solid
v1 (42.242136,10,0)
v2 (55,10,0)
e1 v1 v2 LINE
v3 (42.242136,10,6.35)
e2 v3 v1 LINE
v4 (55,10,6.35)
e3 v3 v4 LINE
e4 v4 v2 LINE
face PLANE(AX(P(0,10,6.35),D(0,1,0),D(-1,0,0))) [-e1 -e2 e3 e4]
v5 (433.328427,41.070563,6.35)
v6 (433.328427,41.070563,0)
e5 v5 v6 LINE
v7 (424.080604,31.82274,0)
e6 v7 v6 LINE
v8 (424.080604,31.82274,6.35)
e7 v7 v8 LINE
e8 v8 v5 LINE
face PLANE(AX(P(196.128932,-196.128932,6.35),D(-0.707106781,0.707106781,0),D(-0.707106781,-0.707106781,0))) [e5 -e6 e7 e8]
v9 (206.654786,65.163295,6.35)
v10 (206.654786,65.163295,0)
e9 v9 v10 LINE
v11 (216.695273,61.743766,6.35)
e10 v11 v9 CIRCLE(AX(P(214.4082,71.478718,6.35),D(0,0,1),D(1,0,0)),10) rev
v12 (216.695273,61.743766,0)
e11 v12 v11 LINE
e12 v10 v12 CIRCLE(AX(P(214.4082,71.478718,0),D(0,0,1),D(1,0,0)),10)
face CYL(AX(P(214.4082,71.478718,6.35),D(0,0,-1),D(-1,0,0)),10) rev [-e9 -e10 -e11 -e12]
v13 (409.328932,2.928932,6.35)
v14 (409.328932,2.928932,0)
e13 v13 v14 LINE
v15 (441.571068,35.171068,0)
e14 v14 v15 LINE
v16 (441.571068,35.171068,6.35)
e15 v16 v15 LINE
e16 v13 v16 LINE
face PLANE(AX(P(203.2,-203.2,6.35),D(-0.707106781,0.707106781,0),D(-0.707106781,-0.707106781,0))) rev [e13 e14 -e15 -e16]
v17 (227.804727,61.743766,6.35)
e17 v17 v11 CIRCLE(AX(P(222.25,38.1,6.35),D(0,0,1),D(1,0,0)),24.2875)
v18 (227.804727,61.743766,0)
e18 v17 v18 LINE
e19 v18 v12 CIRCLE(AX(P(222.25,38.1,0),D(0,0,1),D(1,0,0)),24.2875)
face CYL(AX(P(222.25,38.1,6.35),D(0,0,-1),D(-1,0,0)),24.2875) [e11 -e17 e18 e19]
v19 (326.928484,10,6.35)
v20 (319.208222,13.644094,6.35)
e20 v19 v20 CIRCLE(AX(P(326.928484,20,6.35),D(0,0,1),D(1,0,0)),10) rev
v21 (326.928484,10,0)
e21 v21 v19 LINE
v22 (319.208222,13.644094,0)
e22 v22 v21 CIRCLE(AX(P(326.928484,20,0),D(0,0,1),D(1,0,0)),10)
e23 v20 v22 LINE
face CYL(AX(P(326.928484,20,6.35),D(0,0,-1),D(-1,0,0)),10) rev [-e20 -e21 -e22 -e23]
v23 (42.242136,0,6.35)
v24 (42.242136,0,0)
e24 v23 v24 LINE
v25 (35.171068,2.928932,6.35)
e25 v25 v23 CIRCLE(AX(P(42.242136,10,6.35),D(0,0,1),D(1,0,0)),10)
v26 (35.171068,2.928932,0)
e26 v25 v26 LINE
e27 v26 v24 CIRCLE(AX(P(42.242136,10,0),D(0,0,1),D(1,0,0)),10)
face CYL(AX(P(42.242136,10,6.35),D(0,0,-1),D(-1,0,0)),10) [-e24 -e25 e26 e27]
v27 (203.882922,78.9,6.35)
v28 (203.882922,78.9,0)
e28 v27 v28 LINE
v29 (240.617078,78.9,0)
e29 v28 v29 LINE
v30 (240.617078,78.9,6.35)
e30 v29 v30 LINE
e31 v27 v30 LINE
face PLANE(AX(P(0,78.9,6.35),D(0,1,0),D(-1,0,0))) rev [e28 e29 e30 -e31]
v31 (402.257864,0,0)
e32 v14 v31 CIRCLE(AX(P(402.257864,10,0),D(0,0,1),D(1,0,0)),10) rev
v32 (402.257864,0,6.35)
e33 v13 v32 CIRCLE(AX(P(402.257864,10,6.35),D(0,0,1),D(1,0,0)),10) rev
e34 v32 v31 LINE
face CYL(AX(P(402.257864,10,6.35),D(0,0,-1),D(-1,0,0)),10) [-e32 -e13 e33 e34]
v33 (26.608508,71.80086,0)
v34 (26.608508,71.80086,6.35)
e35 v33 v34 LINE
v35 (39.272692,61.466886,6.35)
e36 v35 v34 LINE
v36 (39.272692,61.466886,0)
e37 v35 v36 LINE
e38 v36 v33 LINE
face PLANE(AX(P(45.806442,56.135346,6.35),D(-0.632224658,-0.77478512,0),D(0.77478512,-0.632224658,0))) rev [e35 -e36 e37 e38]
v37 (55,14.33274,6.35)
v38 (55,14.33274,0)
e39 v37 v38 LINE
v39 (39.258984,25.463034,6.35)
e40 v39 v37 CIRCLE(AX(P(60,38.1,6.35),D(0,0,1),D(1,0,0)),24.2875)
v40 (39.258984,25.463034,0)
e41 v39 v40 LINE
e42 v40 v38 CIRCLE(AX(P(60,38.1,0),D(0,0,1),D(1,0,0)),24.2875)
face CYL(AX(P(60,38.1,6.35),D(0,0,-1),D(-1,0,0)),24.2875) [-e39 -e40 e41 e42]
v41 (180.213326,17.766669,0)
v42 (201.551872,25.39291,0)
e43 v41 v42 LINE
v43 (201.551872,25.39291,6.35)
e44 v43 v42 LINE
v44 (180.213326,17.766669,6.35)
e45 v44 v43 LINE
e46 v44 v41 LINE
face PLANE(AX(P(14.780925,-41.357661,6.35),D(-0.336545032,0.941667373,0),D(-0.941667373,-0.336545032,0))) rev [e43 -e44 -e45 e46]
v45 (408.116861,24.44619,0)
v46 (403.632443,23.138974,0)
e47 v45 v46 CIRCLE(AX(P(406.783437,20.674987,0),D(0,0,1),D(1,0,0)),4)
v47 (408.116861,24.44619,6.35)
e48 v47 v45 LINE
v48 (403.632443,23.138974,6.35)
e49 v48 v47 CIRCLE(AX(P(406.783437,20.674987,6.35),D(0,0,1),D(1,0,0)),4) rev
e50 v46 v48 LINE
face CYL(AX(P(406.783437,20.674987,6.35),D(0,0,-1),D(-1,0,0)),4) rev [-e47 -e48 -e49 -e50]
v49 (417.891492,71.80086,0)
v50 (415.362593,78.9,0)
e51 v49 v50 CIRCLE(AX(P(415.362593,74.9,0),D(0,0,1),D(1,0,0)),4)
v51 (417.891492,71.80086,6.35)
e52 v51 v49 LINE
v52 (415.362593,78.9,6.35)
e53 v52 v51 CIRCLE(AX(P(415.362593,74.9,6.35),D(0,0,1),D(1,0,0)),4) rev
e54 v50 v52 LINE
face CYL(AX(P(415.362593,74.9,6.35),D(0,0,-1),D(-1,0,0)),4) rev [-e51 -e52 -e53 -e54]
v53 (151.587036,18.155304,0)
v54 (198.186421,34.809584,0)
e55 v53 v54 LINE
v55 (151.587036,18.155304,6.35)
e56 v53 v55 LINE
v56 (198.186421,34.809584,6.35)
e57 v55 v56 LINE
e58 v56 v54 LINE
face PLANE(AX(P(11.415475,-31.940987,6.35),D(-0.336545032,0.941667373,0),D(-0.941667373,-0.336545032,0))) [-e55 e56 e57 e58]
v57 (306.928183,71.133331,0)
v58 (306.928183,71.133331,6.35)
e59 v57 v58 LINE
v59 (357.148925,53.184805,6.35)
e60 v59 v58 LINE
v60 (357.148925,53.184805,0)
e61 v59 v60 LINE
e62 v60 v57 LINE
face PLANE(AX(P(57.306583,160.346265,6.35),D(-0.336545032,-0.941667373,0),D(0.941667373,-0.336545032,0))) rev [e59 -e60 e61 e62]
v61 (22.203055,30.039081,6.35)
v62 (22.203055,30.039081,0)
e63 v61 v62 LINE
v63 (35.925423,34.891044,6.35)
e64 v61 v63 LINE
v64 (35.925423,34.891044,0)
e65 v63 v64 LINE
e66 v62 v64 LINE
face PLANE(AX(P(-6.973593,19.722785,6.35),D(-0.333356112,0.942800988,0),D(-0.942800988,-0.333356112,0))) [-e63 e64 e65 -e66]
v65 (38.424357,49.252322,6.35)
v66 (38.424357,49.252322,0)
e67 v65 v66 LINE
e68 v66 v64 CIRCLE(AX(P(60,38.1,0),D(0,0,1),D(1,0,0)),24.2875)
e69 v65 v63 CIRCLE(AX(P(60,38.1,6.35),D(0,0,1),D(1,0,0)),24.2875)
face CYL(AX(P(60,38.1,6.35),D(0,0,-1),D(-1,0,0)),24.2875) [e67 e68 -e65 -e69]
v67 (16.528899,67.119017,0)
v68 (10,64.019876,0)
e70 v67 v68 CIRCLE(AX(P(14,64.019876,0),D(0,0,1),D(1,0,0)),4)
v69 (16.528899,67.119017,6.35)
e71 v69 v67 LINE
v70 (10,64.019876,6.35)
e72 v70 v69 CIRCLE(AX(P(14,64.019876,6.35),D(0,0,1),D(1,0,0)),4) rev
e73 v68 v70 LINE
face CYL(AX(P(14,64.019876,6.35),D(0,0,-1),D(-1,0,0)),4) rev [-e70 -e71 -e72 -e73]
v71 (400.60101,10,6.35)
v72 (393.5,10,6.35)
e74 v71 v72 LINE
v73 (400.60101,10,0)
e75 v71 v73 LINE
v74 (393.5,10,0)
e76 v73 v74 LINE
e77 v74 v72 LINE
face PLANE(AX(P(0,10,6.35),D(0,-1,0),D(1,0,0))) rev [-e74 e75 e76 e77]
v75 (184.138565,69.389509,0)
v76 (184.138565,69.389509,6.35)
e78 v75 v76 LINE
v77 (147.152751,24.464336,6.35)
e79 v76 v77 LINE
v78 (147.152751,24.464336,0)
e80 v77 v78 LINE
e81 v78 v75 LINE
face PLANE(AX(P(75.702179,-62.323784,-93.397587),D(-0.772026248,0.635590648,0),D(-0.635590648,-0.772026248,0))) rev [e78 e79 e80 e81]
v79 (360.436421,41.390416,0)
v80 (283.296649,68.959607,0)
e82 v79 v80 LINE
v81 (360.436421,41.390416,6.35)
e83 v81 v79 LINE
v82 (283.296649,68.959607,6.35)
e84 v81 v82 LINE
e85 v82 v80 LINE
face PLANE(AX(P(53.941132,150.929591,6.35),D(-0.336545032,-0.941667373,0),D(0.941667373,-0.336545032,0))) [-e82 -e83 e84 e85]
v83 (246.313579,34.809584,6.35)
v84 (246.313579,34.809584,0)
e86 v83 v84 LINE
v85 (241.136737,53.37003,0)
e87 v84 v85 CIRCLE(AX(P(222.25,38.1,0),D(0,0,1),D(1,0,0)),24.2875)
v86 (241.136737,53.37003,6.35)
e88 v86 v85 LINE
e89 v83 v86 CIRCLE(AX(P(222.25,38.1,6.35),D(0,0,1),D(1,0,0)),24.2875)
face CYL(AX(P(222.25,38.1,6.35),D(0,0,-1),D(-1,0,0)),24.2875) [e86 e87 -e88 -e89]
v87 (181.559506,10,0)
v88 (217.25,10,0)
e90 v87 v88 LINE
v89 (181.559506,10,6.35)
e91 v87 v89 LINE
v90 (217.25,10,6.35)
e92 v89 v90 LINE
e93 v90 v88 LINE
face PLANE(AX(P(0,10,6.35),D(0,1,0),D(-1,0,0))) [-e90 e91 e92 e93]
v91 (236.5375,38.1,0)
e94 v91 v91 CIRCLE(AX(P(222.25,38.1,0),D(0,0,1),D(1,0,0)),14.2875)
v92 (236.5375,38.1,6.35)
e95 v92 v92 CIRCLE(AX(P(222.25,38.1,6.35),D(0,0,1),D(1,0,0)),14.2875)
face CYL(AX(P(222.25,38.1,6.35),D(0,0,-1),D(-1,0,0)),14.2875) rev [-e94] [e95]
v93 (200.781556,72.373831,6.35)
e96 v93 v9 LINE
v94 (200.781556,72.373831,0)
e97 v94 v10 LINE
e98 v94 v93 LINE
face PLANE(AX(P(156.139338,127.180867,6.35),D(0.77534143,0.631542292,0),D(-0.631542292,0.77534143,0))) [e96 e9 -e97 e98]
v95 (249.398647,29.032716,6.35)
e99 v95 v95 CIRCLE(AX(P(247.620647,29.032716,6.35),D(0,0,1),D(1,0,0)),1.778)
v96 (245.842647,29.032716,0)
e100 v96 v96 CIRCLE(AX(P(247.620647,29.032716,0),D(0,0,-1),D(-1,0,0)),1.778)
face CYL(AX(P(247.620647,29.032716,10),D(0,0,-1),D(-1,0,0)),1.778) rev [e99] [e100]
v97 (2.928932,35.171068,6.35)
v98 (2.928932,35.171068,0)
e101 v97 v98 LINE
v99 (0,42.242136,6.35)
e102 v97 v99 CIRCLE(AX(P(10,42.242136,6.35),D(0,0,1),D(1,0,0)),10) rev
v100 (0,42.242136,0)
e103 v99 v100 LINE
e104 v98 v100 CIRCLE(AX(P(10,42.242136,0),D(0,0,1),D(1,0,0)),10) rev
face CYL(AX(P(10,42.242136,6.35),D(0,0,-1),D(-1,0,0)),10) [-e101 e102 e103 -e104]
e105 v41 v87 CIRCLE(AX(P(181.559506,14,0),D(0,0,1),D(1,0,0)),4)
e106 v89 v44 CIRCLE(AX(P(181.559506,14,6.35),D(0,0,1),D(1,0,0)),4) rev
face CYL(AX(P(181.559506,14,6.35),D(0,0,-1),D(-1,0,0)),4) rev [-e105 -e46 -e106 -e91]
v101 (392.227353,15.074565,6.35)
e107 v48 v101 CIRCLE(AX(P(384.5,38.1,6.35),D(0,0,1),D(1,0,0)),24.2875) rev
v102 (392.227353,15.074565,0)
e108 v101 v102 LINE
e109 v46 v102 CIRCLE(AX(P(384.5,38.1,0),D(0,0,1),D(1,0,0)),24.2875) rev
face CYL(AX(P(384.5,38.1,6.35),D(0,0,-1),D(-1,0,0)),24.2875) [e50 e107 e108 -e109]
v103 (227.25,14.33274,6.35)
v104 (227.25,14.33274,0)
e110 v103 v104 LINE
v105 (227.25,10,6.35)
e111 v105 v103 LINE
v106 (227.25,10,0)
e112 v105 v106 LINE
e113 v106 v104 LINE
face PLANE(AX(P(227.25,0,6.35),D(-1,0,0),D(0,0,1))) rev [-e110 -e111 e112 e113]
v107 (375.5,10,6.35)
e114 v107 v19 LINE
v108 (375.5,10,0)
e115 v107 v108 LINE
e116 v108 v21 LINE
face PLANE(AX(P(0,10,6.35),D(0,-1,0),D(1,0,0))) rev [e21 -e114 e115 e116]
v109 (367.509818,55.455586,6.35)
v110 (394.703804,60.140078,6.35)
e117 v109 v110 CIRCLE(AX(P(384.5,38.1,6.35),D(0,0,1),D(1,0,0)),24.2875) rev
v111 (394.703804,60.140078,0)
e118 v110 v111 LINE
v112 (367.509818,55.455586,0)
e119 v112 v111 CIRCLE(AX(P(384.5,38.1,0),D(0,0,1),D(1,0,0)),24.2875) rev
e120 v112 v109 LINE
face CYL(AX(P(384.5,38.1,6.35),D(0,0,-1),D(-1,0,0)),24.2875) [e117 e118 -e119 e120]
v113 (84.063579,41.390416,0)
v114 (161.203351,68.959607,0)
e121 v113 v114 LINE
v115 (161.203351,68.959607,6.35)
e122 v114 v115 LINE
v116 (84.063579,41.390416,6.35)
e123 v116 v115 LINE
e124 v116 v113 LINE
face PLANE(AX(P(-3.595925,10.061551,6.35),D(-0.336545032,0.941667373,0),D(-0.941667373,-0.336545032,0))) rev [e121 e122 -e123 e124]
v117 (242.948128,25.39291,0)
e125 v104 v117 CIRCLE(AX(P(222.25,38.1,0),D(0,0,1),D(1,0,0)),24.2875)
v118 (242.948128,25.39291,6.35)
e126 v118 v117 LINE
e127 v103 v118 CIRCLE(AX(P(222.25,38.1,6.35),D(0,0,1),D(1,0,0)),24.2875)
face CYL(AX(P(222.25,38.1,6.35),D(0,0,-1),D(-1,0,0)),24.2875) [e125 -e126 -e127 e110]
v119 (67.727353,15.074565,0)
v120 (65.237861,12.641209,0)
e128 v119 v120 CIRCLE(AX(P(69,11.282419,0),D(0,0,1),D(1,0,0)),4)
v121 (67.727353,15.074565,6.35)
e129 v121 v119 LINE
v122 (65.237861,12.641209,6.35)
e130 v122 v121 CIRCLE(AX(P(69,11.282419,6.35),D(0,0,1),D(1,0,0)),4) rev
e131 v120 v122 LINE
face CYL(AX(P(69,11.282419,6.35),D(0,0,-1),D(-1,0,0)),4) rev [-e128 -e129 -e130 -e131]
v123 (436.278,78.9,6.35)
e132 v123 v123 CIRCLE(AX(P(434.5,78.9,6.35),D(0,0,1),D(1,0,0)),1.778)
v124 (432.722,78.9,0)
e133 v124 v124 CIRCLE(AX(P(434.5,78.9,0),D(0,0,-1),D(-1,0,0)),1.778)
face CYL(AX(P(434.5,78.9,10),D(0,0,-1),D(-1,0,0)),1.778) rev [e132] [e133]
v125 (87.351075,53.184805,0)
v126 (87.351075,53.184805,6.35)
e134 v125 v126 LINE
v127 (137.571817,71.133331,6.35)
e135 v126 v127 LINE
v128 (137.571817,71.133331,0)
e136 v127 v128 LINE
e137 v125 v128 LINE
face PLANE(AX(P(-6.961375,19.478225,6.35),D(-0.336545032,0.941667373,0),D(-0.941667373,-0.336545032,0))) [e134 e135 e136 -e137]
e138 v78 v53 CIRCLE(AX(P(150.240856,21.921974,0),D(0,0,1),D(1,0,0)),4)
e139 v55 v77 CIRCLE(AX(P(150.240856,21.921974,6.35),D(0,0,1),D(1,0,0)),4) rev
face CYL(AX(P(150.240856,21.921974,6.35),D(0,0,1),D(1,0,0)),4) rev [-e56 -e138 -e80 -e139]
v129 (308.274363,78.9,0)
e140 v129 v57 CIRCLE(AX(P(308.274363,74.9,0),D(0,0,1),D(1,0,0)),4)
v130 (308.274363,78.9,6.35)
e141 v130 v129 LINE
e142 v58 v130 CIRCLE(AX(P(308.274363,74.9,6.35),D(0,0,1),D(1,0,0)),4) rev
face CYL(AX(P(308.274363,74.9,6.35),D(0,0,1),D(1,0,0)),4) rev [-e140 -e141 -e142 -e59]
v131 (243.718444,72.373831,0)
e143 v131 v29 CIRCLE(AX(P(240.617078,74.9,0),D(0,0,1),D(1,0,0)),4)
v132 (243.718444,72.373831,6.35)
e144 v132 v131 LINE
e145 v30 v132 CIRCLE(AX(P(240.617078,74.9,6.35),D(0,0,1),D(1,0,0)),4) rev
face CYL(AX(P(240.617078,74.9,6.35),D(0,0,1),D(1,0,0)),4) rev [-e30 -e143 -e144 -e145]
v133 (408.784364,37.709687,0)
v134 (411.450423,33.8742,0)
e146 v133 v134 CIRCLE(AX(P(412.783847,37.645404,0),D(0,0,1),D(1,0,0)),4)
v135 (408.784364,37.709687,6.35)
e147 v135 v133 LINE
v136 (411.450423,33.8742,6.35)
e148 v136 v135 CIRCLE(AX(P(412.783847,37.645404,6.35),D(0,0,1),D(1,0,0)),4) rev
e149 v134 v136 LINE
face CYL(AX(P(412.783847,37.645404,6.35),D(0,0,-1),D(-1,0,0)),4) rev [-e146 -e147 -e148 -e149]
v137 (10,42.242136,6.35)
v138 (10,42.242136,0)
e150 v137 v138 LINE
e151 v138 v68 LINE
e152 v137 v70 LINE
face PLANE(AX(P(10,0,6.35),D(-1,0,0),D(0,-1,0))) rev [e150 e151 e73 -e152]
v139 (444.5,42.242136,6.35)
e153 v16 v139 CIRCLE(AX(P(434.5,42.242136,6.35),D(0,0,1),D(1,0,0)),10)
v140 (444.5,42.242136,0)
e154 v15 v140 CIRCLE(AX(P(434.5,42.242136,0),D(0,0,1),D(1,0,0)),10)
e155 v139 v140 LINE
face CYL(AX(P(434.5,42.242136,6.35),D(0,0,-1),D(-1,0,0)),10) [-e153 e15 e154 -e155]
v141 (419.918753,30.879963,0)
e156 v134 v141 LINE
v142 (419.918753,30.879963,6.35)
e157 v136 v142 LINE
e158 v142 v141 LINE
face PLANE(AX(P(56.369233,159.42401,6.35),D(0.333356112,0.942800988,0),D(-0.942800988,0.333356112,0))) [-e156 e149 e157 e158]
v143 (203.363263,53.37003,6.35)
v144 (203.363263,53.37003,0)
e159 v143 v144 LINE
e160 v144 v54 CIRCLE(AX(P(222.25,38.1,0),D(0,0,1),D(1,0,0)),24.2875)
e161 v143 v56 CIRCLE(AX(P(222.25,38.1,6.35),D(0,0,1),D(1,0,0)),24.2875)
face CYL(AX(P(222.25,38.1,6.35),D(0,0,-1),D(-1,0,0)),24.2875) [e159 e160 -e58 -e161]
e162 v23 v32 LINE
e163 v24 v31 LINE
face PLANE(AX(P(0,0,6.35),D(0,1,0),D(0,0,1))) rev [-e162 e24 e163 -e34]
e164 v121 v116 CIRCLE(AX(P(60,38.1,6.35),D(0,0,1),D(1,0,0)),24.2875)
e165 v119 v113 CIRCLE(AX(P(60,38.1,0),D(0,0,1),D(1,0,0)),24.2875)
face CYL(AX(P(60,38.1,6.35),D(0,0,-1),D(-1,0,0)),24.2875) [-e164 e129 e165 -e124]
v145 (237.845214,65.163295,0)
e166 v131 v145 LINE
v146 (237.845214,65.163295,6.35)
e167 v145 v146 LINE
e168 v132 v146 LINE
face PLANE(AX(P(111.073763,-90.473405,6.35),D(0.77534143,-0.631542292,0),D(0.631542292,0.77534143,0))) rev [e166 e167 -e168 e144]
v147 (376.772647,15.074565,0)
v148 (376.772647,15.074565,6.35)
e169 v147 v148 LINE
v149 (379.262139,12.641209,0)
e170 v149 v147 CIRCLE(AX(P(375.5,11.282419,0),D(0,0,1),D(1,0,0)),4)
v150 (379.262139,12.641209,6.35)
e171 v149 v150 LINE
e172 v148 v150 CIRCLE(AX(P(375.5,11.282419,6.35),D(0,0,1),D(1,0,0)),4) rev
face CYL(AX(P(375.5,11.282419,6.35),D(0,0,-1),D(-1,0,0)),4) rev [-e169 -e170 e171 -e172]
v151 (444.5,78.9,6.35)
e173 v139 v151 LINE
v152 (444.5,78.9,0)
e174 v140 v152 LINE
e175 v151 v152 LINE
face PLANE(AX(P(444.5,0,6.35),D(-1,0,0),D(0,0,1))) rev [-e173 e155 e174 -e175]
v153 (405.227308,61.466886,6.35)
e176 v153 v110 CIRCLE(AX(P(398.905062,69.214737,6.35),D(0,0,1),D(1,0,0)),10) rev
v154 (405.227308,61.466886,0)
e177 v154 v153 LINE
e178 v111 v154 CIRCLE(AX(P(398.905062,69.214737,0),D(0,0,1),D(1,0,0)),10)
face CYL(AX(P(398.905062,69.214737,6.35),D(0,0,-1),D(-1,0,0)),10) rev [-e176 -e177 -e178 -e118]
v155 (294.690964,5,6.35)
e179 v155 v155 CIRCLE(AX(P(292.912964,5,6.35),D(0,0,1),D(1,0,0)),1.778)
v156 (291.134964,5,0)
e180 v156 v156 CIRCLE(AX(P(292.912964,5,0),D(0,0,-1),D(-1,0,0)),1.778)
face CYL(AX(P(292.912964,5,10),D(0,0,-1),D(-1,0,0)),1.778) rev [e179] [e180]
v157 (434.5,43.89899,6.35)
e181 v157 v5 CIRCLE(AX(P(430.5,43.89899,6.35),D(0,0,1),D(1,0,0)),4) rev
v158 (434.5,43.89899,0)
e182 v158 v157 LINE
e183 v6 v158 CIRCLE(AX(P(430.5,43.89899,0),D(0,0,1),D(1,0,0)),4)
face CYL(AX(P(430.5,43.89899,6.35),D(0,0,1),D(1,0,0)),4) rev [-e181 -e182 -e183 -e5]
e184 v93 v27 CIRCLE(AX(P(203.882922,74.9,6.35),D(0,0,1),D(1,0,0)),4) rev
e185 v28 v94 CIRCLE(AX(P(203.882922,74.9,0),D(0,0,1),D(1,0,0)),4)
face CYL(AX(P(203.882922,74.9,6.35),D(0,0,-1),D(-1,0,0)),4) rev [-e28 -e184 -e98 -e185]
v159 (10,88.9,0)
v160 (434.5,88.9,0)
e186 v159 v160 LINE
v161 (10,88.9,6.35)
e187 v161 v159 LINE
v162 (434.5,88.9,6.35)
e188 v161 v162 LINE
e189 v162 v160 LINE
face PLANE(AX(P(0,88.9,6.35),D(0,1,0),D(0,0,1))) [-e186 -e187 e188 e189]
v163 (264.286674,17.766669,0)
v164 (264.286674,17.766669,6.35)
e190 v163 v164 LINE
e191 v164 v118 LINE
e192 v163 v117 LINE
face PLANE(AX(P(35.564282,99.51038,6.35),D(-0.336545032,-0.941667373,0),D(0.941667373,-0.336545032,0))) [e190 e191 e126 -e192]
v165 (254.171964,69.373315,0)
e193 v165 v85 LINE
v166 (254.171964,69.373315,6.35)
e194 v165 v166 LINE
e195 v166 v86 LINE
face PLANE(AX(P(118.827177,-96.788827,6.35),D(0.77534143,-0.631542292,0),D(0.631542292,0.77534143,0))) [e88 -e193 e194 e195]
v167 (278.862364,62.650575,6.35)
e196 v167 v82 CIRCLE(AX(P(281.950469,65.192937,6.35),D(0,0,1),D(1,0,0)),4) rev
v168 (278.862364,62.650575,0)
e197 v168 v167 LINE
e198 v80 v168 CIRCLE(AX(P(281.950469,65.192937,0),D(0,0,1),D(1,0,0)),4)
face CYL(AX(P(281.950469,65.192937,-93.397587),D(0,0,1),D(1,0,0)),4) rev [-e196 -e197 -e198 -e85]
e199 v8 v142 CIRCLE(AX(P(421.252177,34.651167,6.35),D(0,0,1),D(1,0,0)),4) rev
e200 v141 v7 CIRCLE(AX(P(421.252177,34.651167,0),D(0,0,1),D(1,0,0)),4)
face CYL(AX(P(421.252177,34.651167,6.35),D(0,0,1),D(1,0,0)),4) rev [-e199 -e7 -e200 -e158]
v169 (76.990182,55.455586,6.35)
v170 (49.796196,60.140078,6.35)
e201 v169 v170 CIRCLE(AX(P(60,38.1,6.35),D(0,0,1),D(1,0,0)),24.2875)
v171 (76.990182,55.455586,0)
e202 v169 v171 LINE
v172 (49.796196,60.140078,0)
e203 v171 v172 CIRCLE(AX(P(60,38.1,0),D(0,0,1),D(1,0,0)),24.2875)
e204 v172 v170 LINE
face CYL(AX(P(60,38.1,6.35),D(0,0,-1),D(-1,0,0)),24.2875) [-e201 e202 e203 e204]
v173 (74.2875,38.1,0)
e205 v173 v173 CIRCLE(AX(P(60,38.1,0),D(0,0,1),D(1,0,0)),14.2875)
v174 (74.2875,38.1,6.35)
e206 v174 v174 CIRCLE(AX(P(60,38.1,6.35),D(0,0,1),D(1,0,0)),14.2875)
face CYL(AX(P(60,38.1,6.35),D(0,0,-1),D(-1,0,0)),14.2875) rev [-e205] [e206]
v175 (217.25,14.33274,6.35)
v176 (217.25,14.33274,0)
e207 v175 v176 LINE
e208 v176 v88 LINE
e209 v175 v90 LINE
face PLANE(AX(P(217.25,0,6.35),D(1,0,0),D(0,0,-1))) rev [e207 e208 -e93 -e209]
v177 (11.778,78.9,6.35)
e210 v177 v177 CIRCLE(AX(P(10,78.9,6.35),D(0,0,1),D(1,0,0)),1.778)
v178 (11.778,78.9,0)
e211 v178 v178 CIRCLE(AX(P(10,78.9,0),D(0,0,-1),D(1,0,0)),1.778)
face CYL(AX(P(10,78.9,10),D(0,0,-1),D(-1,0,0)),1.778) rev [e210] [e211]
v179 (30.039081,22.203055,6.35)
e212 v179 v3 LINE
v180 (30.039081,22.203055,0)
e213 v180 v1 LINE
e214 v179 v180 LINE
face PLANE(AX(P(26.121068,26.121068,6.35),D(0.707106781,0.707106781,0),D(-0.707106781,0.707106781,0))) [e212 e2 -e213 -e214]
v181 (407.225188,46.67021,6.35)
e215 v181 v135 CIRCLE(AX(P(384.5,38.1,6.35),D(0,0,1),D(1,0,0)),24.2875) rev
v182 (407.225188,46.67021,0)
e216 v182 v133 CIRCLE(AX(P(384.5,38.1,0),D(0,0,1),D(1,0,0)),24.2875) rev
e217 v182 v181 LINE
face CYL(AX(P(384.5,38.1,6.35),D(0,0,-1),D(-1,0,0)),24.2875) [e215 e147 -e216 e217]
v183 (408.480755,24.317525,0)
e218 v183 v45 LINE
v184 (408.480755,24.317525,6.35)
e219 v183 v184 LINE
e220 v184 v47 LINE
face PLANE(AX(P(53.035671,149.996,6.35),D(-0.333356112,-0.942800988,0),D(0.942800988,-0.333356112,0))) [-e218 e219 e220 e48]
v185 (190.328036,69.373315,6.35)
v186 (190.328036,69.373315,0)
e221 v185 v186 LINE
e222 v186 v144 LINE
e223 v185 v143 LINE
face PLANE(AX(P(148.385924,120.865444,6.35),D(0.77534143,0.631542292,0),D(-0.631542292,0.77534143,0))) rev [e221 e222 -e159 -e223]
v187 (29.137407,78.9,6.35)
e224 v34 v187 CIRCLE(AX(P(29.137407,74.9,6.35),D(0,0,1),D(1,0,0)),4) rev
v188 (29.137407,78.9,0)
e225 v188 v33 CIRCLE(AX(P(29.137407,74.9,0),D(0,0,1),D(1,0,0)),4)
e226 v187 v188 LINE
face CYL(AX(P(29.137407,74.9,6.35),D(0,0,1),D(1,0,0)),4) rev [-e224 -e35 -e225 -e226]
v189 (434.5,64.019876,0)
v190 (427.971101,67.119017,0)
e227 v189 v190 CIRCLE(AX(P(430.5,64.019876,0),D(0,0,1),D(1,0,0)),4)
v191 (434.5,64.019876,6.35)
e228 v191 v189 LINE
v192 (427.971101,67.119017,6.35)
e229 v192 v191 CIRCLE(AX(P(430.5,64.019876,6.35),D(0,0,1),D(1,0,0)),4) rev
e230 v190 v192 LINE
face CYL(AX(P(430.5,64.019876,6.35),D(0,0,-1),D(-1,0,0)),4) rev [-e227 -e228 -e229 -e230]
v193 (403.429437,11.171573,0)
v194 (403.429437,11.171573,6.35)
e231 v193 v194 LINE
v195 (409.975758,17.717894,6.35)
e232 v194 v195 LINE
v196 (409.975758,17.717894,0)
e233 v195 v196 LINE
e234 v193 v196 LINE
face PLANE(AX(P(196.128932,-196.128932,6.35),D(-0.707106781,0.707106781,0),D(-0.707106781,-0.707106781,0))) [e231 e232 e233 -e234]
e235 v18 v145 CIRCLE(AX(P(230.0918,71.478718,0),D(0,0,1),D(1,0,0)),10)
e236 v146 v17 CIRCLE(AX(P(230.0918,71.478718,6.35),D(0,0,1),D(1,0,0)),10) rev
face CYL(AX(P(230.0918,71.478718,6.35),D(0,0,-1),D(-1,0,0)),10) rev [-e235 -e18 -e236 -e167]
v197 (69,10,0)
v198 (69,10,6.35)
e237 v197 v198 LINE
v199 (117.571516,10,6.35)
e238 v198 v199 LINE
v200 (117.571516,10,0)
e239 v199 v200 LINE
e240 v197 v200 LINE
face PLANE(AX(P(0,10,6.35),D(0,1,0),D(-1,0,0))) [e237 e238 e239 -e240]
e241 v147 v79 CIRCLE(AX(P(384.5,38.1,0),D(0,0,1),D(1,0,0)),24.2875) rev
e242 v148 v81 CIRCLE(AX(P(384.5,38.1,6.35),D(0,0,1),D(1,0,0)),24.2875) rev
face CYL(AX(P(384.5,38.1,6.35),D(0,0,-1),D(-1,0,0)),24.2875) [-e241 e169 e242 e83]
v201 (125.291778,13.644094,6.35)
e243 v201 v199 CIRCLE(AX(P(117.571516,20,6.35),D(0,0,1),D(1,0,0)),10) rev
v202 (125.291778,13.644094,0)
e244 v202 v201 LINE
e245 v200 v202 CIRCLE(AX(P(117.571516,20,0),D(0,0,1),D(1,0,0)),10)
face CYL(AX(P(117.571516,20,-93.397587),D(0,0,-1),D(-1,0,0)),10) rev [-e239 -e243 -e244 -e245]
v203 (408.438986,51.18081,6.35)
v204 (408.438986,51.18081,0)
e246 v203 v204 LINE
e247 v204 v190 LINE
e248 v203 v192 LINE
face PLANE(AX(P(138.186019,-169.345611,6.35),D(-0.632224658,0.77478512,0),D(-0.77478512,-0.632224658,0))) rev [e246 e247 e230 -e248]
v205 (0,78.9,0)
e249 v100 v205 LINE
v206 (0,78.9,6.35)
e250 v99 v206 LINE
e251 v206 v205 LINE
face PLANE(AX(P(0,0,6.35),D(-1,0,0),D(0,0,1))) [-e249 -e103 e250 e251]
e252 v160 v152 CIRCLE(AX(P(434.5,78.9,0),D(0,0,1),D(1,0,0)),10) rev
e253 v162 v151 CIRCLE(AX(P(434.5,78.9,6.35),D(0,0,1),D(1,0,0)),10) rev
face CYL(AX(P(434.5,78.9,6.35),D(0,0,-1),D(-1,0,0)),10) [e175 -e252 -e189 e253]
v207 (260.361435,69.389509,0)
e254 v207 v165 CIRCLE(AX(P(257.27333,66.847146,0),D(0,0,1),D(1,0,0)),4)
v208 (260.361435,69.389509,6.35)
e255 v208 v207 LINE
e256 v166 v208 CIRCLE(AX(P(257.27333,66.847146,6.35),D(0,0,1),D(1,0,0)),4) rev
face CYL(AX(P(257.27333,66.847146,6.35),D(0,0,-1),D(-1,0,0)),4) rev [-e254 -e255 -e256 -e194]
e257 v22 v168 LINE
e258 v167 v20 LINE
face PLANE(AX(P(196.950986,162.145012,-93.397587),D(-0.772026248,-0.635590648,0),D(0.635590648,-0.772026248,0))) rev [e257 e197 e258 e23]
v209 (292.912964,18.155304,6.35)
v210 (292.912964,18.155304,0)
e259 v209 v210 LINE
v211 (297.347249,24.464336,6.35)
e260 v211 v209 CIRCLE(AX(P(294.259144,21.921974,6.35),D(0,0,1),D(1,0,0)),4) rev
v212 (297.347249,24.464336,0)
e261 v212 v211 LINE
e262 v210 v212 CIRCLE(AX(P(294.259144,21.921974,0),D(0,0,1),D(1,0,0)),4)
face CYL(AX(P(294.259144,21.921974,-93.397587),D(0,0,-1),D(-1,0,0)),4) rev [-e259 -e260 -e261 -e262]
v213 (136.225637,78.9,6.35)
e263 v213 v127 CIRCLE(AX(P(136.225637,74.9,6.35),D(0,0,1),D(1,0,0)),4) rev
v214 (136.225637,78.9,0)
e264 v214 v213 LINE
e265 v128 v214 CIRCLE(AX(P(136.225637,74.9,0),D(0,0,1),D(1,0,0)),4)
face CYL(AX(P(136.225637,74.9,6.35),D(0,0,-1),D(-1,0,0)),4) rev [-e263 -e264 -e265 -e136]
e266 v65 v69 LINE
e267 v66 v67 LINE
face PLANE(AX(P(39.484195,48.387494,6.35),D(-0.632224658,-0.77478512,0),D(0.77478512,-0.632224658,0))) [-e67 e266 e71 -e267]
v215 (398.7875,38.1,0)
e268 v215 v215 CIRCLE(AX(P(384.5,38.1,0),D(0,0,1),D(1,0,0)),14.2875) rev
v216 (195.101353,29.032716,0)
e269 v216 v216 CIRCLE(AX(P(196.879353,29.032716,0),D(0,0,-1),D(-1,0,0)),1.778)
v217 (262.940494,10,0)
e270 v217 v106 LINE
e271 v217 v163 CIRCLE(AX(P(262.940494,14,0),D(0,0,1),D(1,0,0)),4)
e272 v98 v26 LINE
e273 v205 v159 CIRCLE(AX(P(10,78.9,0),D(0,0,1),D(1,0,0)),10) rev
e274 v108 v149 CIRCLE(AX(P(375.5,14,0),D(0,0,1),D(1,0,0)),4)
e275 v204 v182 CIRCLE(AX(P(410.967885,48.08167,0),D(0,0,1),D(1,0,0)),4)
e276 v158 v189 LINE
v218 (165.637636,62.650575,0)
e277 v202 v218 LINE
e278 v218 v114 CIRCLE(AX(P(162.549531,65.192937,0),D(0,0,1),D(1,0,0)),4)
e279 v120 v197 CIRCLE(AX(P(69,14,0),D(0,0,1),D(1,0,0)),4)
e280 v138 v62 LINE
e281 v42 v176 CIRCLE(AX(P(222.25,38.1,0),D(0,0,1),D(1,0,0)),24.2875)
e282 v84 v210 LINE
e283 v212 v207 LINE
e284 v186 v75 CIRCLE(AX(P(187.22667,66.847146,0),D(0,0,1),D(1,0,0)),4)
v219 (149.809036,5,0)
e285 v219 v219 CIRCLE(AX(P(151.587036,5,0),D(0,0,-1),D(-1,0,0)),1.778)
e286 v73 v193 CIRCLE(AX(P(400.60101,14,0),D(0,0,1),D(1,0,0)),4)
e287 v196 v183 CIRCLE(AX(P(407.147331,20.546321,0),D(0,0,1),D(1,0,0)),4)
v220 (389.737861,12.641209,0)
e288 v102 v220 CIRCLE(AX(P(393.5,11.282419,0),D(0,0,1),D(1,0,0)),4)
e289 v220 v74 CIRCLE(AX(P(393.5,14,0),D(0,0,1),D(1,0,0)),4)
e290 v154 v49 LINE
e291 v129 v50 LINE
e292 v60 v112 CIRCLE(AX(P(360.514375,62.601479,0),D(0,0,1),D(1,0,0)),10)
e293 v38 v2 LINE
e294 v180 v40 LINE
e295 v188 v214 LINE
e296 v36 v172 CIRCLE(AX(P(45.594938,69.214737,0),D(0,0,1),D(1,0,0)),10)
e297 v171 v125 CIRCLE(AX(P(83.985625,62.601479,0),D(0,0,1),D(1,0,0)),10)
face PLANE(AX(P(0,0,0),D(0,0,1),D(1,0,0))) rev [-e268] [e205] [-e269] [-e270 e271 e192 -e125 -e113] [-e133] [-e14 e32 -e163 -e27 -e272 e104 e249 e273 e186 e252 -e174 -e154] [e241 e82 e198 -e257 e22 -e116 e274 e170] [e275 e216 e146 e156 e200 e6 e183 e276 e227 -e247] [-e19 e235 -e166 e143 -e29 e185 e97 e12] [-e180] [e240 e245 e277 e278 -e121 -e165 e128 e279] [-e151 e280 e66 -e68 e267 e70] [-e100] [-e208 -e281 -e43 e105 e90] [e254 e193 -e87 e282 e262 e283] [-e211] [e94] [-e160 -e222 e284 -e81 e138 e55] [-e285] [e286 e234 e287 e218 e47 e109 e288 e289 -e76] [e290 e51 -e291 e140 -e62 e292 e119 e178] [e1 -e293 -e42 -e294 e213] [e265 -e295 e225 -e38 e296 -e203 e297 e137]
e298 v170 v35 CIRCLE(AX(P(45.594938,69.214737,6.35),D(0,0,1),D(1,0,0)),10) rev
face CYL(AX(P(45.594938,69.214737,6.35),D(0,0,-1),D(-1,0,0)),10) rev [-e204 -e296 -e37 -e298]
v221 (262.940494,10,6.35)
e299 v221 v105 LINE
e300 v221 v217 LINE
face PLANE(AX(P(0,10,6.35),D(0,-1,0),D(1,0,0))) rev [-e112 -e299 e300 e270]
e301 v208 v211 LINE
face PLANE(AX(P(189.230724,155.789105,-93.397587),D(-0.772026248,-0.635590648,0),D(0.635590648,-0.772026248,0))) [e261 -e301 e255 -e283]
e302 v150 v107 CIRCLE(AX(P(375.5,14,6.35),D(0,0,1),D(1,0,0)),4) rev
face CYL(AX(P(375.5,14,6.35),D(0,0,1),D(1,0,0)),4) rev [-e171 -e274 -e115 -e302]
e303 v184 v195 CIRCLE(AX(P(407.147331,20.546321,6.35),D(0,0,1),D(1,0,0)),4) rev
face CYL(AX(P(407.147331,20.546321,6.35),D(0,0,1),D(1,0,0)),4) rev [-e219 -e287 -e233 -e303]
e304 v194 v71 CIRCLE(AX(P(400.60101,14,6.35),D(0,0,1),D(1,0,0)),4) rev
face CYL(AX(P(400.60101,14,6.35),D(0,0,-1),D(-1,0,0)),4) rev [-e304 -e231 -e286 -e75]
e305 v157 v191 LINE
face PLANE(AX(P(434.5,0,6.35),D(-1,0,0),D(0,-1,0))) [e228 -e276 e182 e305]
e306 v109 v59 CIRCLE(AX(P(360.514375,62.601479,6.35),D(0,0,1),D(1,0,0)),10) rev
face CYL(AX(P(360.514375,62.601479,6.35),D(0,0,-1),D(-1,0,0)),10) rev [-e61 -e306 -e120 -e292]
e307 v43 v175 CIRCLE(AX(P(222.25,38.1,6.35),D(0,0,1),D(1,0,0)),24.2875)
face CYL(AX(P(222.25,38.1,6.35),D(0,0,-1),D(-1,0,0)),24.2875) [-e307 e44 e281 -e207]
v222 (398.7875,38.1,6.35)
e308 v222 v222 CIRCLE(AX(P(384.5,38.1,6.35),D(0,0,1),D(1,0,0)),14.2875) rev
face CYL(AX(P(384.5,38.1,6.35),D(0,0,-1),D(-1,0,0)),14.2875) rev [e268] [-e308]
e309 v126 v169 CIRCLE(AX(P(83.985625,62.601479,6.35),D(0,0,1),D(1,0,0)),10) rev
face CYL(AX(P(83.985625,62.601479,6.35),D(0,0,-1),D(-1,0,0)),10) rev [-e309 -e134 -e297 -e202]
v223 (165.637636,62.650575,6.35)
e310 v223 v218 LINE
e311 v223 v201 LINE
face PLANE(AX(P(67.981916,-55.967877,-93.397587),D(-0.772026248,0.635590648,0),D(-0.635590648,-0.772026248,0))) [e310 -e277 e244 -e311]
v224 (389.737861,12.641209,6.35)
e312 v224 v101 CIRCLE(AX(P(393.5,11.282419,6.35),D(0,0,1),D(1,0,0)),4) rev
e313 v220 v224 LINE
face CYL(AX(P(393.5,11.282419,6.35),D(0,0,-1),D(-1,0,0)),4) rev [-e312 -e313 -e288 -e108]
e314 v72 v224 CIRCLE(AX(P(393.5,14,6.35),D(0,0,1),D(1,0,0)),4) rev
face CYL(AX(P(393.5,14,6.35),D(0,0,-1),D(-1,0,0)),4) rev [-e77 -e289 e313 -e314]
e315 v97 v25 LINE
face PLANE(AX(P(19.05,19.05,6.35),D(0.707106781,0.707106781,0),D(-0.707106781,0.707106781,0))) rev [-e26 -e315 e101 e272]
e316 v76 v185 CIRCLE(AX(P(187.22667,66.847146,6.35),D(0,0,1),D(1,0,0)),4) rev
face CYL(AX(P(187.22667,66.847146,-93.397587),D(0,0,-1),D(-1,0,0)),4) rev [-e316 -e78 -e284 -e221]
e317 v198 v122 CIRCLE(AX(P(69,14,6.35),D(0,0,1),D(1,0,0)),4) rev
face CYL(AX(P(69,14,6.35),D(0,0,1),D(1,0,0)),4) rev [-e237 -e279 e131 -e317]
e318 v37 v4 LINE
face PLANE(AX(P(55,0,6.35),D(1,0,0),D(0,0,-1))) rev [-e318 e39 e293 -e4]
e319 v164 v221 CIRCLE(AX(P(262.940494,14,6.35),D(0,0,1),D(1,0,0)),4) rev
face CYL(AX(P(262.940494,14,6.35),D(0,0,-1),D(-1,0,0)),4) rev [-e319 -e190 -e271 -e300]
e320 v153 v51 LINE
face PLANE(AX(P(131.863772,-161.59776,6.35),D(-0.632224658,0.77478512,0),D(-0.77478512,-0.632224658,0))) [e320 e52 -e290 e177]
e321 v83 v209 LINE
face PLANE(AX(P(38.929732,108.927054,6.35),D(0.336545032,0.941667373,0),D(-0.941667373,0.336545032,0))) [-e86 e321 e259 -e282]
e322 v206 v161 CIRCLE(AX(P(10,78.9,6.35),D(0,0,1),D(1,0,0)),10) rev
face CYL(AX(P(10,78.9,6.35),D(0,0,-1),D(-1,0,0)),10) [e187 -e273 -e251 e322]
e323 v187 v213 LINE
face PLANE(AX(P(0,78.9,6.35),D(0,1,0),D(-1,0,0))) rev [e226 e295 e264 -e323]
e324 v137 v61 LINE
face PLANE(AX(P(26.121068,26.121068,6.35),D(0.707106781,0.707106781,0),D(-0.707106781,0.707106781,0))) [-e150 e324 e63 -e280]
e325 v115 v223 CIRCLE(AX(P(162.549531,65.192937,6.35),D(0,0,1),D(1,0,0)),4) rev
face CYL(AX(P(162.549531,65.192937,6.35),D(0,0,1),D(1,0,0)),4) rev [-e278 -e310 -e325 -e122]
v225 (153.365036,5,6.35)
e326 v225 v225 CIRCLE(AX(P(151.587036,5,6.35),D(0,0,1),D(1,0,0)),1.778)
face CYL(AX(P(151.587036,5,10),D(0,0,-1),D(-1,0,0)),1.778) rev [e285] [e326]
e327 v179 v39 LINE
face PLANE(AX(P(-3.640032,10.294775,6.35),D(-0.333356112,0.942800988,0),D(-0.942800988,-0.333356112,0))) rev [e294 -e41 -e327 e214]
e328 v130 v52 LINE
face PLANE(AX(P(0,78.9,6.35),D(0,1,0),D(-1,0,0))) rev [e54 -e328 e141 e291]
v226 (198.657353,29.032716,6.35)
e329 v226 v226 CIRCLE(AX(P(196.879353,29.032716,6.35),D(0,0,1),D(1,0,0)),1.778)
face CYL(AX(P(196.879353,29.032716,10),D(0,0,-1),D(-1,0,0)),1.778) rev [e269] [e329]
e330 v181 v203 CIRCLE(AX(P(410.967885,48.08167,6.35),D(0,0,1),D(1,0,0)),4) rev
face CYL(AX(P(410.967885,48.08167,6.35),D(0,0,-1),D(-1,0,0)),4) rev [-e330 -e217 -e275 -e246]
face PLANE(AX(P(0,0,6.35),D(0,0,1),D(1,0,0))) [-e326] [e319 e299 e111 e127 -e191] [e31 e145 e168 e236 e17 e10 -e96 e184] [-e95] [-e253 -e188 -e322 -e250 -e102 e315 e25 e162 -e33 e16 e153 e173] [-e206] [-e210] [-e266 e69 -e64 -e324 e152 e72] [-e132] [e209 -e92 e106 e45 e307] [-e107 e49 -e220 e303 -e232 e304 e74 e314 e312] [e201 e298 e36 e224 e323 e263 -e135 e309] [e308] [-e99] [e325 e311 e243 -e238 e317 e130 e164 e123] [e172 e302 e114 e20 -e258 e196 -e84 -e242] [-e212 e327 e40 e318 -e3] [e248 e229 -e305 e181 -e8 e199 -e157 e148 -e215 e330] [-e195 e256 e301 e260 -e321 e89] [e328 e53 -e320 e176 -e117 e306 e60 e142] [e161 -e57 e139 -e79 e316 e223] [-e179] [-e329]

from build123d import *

# Parameters (mm, degrees)
SKETCH1_R           = 14.2875
BOSS_EXTRUDE1_DEPTH = 6.35
BOSS_EXTRUDE2_DEPTH = 6.35
FILLET1_R           = 10
FILLET2_R           = 4
FILLET3_R           = 4
SKETCH3_R           = 1.778
CUT_EXTRUDE1_DEPTH  = 10
SKETCH4_R           = 1.778
CUT_EXTRUDE2_DEPTH  = 10


with BuildPart() as part:
    # Sketch1 → Boss-Extrude1 (new body)
    with BuildSketch(Plane.XY):
        with BuildLine():
            Line((2.928932188, 35.171067812), (35.171067812, 2.928932188))
            ThreePointArc((35.171067812, 2.928932188), (38.4153013, 0.761204675), (42.242135624, 0))
            Line((42.242135624, 0), (402.257864376, 0))
            ThreePointArc((402.257864376, 0), (406.0846987, 0.761204675), (409.328932188, 2.928932188))
            Line((409.328932188, 2.928932188), (441.571067812, 35.171067812))
            ThreePointArc((441.571067812, 35.171067812), (443.738795325, 38.4153013), (444.5, 42.242135624))
            Line((444.5, 42.242135624), (444.5, 78.9))
            ThreePointArc((444.5, 78.9), (441.571067812, 85.971067812), (434.5, 88.9))
            Line((434.5, 88.9), (10, 88.9))
            ThreePointArc((10, 88.9), (2.928932188, 85.971067812), (0, 78.9))
            Line((0, 78.9), (0, 42.242135624))
            ThreePointArc((0, 42.242135624), (0.761204675, 38.4153013), (2.928932188, 35.171067812))
        make_face()
        with Locations((60, 38.1)):
            Circle(SKETCH1_R, mode=Mode.SUBTRACT)
        with Locations((384.5, 38.1)):
            Circle(SKETCH1_R, mode=Mode.SUBTRACT)
        with Locations((222.25, 38.1)):
            Circle(SKETCH1_R, mode=Mode.SUBTRACT)
        with BuildLine():
            Line((42.242135624, 10), (55, 10))
            Line((55, 10), (55, 14.332739824))
            ThreePointArc((55, 14.332739824), (45.977844894, 18.269169901), (39.258984185, 25.463033624))
            Line((39.258984185, 25.463033624), (30.039080729, 22.203054895))
            Line((30.039080729, 22.203054895), (42.242135624, 10))
        make_face(mode=Mode.SUBTRACT)
        with BuildLine():
            Line((402.257864376, 10), (414.460919271, 22.203054895))
            Line((414.460919271, 22.203054895), (405.241015815, 25.463033624))
            ThreePointArc((405.241015815, 25.463033624), (398.522155106, 18.269169901), (389.5, 14.332739824))
            Line((389.5, 14.332739824), (389.5, 10))
            Line((389.5, 10), (402.257864376, 10))
        make_face(mode=Mode.SUBTRACT)
        with BuildLine():
            Line((434.5, 42.242135624), (434.5, 72.446597797))
            Line((434.5, 72.446597797), (406.075642814, 49.252322333))
            ThreePointArc((406.075642814, 49.252322333), (408.427959025, 42.263584169), (408.574576932, 34.891043503))
            Line((408.574576932, 34.891043503), (420.045712746, 30.835072751))
            Line((420.045712746, 30.835072751), (422.296945105, 30.039080729))
            Line((422.296945105, 30.039080729), (434.5, 42.242135624))
        make_face(mode=Mode.SUBTRACT)
        with BuildLine():
            Line((17.908581132, 78.9), (159.303289572, 78.9))
            Line((159.303289572, 78.9), (80.698128287, 50.807090212))
            ThreePointArc((80.698128287, 50.807090212), (64.123087075, 62.034970424), (44.746603764, 57.000173532))
            Line((44.746603764, 57.000173532), (17.908581132, 78.9))
        make_face(mode=Mode.SUBTRACT)
        with BuildLine():
            Line((10, 42.242135624), (10, 72.446597797))
            Line((10, 72.446597797), (38.424357186, 49.252322333))
            ThreePointArc((38.424357186, 49.252322333), (36.072040975, 42.263584169), (35.925423068, 34.891043503))
            Line((35.925423068, 34.891043503), (24.454287254, 30.835072751))
            Line((24.454287254, 30.835072751), (22.203054895, 30.039080729))
            Line((22.203054895, 30.039080729), (10, 42.242135624))
        make_face(mode=Mode.SUBTRACT)
        with BuildLine():
            Line((65, 14.332739824), (65, 10))
            Line((65, 10), (128.768147223, 10))
            Line((128.768147223, 10), (141.942274838, 14.708336864))
            Line((141.942274838, 14.708336864), (198.186421388, 34.809583517))
            ThreePointArc((198.186421388, 34.809583517), (198.85545044, 44.625159549), (203.363262878, 53.370030031))
            Line((203.363262878, 53.370030031), (185.140287975, 75.742288539))
            Line((185.140287975, 75.742288539), (184.022239752, 77.114910957))
            Line((184.022239752, 77.114910957), (175.842867511, 74.191663136))
            Line((175.842867511, 74.191663136), (84.063578612, 41.390416483))
            ThreePointArc((84.063578612, 41.390416483), (79.854530137, 24.1114229), (65, 14.332739824))
        make_face(mode=Mode.SUBTRACT)
        with BuildLine():
            Line((399.753396236, 57.000173532), (426.591418868, 78.9))
            Line((426.591418868, 78.9), (285.196710428, 78.9))
            Line((285.196710428, 78.9), (363.801871713, 50.807090212))
            ThreePointArc((363.801871713, 50.807090212), (380.376912925, 62.034970424), (399.753396236, 57.000173532))
        make_face(mode=Mode.SUBTRACT)
        with BuildLine():
            Line((158.481852777, 10), (201.551871713, 25.392909788))
            ThreePointArc((201.551871713, 25.392909788), (208.2614229, 18.245469863), (217.25, 14.332739824))
            Line((217.25, 14.332739824), (217.25, 10))
            Line((217.25, 10), (158.481852777, 10))
        make_face(mode=Mode.SUBTRACT)
        with BuildLine():
            Line((195.465766991, 78.9), (211.116677179, 59.685452953))
            ThreePointArc((211.116677179, 59.685452953), (222.25, 62.3875), (233.383322821, 59.685452953))
            Line((233.383322821, 59.685452953), (249.034233009, 78.9))
            Line((249.034233009, 78.9), (195.465766991, 78.9))
        make_face(mode=Mode.SUBTRACT)
        with BuildLine():
            Line((379.5, 14.332739824), (379.5, 10))
            Line((379.5, 10), (315.731852777, 10))
            Line((315.731852777, 10), (302.557725162, 14.708336864))
            Line((302.557725162, 14.708336864), (246.313578612, 34.809583517))
            ThreePointArc((246.313578612, 34.809583517), (245.64454956, 44.625159549), (241.136737122, 53.370030031))
            Line((241.136737122, 53.370030031), (259.359712025, 75.742288539))
            Line((259.359712025, 75.742288539), (260.477760248, 77.114910957))
            Line((260.477760248, 77.114910957), (268.657132489, 74.191663136))
            Line((268.657132489, 74.191663136), (360.436421388, 41.390416483))
            ThreePointArc((360.436421388, 41.390416483), (364.645469863, 24.1114229), (379.5, 14.332739824))
        make_face(mode=Mode.SUBTRACT)
        with BuildLine():
            Line((286.018147223, 10), (227.25, 10))
            Line((227.25, 10), (227.25, 14.332739824))
            ThreePointArc((227.25, 14.332739824), (236.2385771, 18.245469863), (242.948128287, 25.392909788))
            Line((242.948128287, 25.392909788), (286.018147223, 10))
        make_face(mode=Mode.SUBTRACT)
    extrude(amount=BOSS_EXTRUDE1_DEPTH)

    # Sketch2 → Boss-Extrude2 (add)
    with BuildSketch(Plane.XY.offset(6.35)):
        Polygon((184.022239752, 77.114910957), (174.845752388, 73.835301483), (124.908015982, 13.177953241), (122.291683488, 10), (128.768147223, 10), (137.944634587, 13.279609474), (187.243188129, 73.160568149), align=None)
        Polygon((269.654247612, 73.835301483), (319.591984018, 13.177953241), (322.208316512, 10), (315.731852777, 10), (306.555365413, 13.279609474), (257.256811871, 73.160568149), (260.477760248, 77.114910957), align=None)
    extrude(amount=-BOSS_EXTRUDE2_DEPTH)

    # Fillet1
    fillet1_edges = [part.edges().sort_by_distance(p)[0] for p in [
        (211.116677179, 59.685452953, 3.175),
        (233.383322821, 59.685452953, 3.175),
        (44.746603764, 57.000173532, 3.175),
        (80.698128287, 50.807090212, 3.175),
        (399.753396236, 57.000173532, 3.175),
        (363.801871713, 50.807090212, 3.175),
        (122.291683488, 10, 3.175),
        (322.208316512, 10, 3.175),
    ]]
    fillet(fillet1_edges, radius=FILLET1_R)

    # Fillet2
    fillet2_edges = [part.edges().sort_by_distance(p)[0] for p in [
        (249.034233009, 78.9, 3.175),
        (195.465766991, 78.9, 3.175),
        (286.018147223, 10, 3.175),
        (159.303289572, 78.9, 3.175),
        (17.908581132, 78.9, 3.175),
        (158.481852777, 10, 3.175),
        (10, 72.446597797, 3.175),
        (426.591418868, 78.9, 3.175),
        (285.196710428, 78.9, 3.175),
        (434.5, 72.446597797, 3.175),
        (174.845752388, 73.835301483, 3.175),
        (187.243188129, 73.160568149, 3.175),
        (137.944634587, 13.279609474, 3.175),
        (269.654247612, 73.835301483, 3.175),
        (306.555365413, 13.279609474, 3.175),
        (257.256811871, 73.160568149, 3.175),
    ]]
    fillet(fillet2_edges, radius=FILLET2_R)

    # Fillet3
    # the kernel refuses this fillet: 4 mm, written as the material it adds along each edge
    with BuildSketch(Plane(origin=(434.5, 42.242135624, 0), x_dir=(0, 1, 0), z_dir=(0, 0, 1)), Plane(origin=(402.257864376, 10, 0), x_dir=(0.7071067811865684, 0.7071067811865266, 0), z_dir=(0, 0, 1))) as fillet3_piece_1:
        with BuildLine():
            CenterArc((FILLET3_R * 0.414213562373, FILLET3_R), FILLET3_R, 225, 45)
            Line((-FILLET3_R * 0.292893218813, FILLET3_R * 0.292893218813), (0, 0))
            Line((0, 0), (FILLET3_R * 0.414213562373, 0))
        make_face()
    extrude(amount=6.35)
    with BuildSketch(Plane(origin=(422.296945105, 30.039080729, 0), x_dir=(-0.9428009879202438, 0.33335611165330736, 0), z_dir=(0, 0, 1))) as fillet3_piece_2:
        with BuildLine():
            CenterArc((FILLET3_R * 0.630618821441, -FILLET3_R), FILLET3_R, 90, 64.47260491)
            Line((-FILLET3_R * 0.271760517527, -FILLET3_R * 0.569057395232), (0, 0))
            Line((0, 0), (FILLET3_R * 0.630618821441, 0))
        make_face()
    extrude(amount=6.35)
    with BuildSketch(Plane(origin=(408.574576932, 34.891043503, 0), x_dir=(0.07422292500138471, 0.9972416745223992, 0), z_dir=(0, 0, 1)), Plane(origin=(389.5, 14.332739824, 0), x_dir=(0.9649431016089534, 0.262459159979783, 0), z_dir=(0, 0, 1)), Plane(origin=(65, 14.332739824, 0), x_dir=(0.9649431016089596, 0.2624591599797595, 0), z_dir=(0, 0, 1))) as fillet3_piece_3:
        with BuildLine():
            CenterArc((3.059187738, -3.993222777), FILLET3_R, 93.335760439, 71.44820939)
            Line((-0.800584668, -2.943386137), (0, 0))
            ThreePointArc((0, 0), (1.413219633, -0.04115045), (2.826439265, 0))
        make_face()
    extrude(amount=6.35)
    with BuildSketch(Plane(origin=(406.075642814, 49.252322333, 0), x_dir=(0.774785119901029, 0.632224657839243, 0), z_dir=(0, 0, 1))) as fillet3_piece_4:
        with BuildLine():
            CenterArc((3.050320928, -4), FILLET3_R, 90, 71.44820939)
            ThreePointArc((-0.741824875, -2.727353071), (-0.331204595, -1.374476848), (0, 0))
            Line((0, 0), (3.050320928, 0))
        make_face()
    extrude(amount=6.35)
    with BuildSketch(Plane(origin=(414.460919271, 22.203054895, 0), x_dir=(-0.9428009879202406, 0.33335611165331624, 0), z_dir=(0, 0, 1))) as fillet3_piece_5:
        with BuildLine():
            CenterArc((FILLET3_R * 1.58574398036, FILLET3_R), FILLET3_R, 154.47260491, 115.52739509)
            Line((FILLET3_R * 0.68336464139, FILLET3_R * 1.43094260477), (0, 0))
            Line((0, 0), (FILLET3_R * 1.58574398036, 0))
        make_face()
    extrude(amount=6.35)
    with BuildSketch(Plane(origin=(405.241015815, 25.463033624, 0), x_dir=(-0.5691164356367163, -0.82225694444508, 0), z_dir=(0, 0, 1)), Plane(origin=(379.5, 14.332739824, 0), x_dir=(-0.9649431016089597, 0.2624591599797589, 0), z_dir=(0, 0, 1))) as fillet3_piece_6:
        with BuildLine():
            CenterArc((3.059187738, 3.993222777), FILLET3_R, 195.216030171, 71.44820939)
            Line((-0.800584668, 2.943386137), (0, 0))
            ThreePointArc((0, 0), (1.413219633, 0.04115045), (2.826439265, 0))
        make_face()
    extrude(amount=6.35)
    with BuildSketch(Plane(origin=(389.5, 10, 0), x_dir=(1, 0, 0), z_dir=(0, 0, 1)), Plane(origin=(65, 10, 0), x_dir=(1, 0, 0), z_dir=(0, 0, 1))) as fillet3_piece_7:
        with BuildLine():
            CenterArc((FILLET3_R, FILLET3_R), FILLET3_R, 180, 90)
            Line((0, FILLET3_R), (0, 0))
            Line((0, 0), (FILLET3_R, 0))
        make_face()
    extrude(amount=6.35)
    with BuildSketch(Plane(origin=(379.5, 10, 0), x_dir=(-1, 0, 0), z_dir=(0, 0, 1))) as fillet3_piece_8:
        with BuildLine():
            CenterArc((FILLET3_R, -FILLET3_R), FILLET3_R, 90, 90)
            Line((0, -FILLET3_R), (0, 0))
            Line((0, 0), (FILLET3_R, 0))
        make_face()
    extrude(amount=6.35)

    # Sketch3 → Cut-Extrude1 (cut)
    with BuildSketch(Plane(origin=(0, 0, 0), x_dir=(-1, 0, 0), z_dir=(0, 0, -1))):
        with Locations((-434.5, 78.9)):
            Circle(SKETCH3_R)
        with Locations((-247.620647359, 29.032716175)):
            Circle(SKETCH3_R)
        with Locations((-196.879352641, 29.032716175)):
            Circle(SKETCH3_R)
        with Locations(Location((-10, 78.9, 0), (0, 0, 180))):
            Circle(SKETCH3_R)
    extrude(amount=-CUT_EXTRUDE1_DEPTH, mode=Mode.SUBTRACT)

    # Sketch4 → Cut-Extrude2 (cut)
    with BuildSketch(Plane(origin=(0, 0, 0), x_dir=(-1, 0, 0), z_dir=(0, 0, -1))):
        with Locations((-292.912963738, 5)):
            Circle(SKETCH4_R)
        with Locations((-151.587036262, 5)):
            Circle(SKETCH4_R)
    extrude(amount=-CUT_EXTRUDE2_DEPTH, mode=Mode.SUBTRACT)


solid = part.part
